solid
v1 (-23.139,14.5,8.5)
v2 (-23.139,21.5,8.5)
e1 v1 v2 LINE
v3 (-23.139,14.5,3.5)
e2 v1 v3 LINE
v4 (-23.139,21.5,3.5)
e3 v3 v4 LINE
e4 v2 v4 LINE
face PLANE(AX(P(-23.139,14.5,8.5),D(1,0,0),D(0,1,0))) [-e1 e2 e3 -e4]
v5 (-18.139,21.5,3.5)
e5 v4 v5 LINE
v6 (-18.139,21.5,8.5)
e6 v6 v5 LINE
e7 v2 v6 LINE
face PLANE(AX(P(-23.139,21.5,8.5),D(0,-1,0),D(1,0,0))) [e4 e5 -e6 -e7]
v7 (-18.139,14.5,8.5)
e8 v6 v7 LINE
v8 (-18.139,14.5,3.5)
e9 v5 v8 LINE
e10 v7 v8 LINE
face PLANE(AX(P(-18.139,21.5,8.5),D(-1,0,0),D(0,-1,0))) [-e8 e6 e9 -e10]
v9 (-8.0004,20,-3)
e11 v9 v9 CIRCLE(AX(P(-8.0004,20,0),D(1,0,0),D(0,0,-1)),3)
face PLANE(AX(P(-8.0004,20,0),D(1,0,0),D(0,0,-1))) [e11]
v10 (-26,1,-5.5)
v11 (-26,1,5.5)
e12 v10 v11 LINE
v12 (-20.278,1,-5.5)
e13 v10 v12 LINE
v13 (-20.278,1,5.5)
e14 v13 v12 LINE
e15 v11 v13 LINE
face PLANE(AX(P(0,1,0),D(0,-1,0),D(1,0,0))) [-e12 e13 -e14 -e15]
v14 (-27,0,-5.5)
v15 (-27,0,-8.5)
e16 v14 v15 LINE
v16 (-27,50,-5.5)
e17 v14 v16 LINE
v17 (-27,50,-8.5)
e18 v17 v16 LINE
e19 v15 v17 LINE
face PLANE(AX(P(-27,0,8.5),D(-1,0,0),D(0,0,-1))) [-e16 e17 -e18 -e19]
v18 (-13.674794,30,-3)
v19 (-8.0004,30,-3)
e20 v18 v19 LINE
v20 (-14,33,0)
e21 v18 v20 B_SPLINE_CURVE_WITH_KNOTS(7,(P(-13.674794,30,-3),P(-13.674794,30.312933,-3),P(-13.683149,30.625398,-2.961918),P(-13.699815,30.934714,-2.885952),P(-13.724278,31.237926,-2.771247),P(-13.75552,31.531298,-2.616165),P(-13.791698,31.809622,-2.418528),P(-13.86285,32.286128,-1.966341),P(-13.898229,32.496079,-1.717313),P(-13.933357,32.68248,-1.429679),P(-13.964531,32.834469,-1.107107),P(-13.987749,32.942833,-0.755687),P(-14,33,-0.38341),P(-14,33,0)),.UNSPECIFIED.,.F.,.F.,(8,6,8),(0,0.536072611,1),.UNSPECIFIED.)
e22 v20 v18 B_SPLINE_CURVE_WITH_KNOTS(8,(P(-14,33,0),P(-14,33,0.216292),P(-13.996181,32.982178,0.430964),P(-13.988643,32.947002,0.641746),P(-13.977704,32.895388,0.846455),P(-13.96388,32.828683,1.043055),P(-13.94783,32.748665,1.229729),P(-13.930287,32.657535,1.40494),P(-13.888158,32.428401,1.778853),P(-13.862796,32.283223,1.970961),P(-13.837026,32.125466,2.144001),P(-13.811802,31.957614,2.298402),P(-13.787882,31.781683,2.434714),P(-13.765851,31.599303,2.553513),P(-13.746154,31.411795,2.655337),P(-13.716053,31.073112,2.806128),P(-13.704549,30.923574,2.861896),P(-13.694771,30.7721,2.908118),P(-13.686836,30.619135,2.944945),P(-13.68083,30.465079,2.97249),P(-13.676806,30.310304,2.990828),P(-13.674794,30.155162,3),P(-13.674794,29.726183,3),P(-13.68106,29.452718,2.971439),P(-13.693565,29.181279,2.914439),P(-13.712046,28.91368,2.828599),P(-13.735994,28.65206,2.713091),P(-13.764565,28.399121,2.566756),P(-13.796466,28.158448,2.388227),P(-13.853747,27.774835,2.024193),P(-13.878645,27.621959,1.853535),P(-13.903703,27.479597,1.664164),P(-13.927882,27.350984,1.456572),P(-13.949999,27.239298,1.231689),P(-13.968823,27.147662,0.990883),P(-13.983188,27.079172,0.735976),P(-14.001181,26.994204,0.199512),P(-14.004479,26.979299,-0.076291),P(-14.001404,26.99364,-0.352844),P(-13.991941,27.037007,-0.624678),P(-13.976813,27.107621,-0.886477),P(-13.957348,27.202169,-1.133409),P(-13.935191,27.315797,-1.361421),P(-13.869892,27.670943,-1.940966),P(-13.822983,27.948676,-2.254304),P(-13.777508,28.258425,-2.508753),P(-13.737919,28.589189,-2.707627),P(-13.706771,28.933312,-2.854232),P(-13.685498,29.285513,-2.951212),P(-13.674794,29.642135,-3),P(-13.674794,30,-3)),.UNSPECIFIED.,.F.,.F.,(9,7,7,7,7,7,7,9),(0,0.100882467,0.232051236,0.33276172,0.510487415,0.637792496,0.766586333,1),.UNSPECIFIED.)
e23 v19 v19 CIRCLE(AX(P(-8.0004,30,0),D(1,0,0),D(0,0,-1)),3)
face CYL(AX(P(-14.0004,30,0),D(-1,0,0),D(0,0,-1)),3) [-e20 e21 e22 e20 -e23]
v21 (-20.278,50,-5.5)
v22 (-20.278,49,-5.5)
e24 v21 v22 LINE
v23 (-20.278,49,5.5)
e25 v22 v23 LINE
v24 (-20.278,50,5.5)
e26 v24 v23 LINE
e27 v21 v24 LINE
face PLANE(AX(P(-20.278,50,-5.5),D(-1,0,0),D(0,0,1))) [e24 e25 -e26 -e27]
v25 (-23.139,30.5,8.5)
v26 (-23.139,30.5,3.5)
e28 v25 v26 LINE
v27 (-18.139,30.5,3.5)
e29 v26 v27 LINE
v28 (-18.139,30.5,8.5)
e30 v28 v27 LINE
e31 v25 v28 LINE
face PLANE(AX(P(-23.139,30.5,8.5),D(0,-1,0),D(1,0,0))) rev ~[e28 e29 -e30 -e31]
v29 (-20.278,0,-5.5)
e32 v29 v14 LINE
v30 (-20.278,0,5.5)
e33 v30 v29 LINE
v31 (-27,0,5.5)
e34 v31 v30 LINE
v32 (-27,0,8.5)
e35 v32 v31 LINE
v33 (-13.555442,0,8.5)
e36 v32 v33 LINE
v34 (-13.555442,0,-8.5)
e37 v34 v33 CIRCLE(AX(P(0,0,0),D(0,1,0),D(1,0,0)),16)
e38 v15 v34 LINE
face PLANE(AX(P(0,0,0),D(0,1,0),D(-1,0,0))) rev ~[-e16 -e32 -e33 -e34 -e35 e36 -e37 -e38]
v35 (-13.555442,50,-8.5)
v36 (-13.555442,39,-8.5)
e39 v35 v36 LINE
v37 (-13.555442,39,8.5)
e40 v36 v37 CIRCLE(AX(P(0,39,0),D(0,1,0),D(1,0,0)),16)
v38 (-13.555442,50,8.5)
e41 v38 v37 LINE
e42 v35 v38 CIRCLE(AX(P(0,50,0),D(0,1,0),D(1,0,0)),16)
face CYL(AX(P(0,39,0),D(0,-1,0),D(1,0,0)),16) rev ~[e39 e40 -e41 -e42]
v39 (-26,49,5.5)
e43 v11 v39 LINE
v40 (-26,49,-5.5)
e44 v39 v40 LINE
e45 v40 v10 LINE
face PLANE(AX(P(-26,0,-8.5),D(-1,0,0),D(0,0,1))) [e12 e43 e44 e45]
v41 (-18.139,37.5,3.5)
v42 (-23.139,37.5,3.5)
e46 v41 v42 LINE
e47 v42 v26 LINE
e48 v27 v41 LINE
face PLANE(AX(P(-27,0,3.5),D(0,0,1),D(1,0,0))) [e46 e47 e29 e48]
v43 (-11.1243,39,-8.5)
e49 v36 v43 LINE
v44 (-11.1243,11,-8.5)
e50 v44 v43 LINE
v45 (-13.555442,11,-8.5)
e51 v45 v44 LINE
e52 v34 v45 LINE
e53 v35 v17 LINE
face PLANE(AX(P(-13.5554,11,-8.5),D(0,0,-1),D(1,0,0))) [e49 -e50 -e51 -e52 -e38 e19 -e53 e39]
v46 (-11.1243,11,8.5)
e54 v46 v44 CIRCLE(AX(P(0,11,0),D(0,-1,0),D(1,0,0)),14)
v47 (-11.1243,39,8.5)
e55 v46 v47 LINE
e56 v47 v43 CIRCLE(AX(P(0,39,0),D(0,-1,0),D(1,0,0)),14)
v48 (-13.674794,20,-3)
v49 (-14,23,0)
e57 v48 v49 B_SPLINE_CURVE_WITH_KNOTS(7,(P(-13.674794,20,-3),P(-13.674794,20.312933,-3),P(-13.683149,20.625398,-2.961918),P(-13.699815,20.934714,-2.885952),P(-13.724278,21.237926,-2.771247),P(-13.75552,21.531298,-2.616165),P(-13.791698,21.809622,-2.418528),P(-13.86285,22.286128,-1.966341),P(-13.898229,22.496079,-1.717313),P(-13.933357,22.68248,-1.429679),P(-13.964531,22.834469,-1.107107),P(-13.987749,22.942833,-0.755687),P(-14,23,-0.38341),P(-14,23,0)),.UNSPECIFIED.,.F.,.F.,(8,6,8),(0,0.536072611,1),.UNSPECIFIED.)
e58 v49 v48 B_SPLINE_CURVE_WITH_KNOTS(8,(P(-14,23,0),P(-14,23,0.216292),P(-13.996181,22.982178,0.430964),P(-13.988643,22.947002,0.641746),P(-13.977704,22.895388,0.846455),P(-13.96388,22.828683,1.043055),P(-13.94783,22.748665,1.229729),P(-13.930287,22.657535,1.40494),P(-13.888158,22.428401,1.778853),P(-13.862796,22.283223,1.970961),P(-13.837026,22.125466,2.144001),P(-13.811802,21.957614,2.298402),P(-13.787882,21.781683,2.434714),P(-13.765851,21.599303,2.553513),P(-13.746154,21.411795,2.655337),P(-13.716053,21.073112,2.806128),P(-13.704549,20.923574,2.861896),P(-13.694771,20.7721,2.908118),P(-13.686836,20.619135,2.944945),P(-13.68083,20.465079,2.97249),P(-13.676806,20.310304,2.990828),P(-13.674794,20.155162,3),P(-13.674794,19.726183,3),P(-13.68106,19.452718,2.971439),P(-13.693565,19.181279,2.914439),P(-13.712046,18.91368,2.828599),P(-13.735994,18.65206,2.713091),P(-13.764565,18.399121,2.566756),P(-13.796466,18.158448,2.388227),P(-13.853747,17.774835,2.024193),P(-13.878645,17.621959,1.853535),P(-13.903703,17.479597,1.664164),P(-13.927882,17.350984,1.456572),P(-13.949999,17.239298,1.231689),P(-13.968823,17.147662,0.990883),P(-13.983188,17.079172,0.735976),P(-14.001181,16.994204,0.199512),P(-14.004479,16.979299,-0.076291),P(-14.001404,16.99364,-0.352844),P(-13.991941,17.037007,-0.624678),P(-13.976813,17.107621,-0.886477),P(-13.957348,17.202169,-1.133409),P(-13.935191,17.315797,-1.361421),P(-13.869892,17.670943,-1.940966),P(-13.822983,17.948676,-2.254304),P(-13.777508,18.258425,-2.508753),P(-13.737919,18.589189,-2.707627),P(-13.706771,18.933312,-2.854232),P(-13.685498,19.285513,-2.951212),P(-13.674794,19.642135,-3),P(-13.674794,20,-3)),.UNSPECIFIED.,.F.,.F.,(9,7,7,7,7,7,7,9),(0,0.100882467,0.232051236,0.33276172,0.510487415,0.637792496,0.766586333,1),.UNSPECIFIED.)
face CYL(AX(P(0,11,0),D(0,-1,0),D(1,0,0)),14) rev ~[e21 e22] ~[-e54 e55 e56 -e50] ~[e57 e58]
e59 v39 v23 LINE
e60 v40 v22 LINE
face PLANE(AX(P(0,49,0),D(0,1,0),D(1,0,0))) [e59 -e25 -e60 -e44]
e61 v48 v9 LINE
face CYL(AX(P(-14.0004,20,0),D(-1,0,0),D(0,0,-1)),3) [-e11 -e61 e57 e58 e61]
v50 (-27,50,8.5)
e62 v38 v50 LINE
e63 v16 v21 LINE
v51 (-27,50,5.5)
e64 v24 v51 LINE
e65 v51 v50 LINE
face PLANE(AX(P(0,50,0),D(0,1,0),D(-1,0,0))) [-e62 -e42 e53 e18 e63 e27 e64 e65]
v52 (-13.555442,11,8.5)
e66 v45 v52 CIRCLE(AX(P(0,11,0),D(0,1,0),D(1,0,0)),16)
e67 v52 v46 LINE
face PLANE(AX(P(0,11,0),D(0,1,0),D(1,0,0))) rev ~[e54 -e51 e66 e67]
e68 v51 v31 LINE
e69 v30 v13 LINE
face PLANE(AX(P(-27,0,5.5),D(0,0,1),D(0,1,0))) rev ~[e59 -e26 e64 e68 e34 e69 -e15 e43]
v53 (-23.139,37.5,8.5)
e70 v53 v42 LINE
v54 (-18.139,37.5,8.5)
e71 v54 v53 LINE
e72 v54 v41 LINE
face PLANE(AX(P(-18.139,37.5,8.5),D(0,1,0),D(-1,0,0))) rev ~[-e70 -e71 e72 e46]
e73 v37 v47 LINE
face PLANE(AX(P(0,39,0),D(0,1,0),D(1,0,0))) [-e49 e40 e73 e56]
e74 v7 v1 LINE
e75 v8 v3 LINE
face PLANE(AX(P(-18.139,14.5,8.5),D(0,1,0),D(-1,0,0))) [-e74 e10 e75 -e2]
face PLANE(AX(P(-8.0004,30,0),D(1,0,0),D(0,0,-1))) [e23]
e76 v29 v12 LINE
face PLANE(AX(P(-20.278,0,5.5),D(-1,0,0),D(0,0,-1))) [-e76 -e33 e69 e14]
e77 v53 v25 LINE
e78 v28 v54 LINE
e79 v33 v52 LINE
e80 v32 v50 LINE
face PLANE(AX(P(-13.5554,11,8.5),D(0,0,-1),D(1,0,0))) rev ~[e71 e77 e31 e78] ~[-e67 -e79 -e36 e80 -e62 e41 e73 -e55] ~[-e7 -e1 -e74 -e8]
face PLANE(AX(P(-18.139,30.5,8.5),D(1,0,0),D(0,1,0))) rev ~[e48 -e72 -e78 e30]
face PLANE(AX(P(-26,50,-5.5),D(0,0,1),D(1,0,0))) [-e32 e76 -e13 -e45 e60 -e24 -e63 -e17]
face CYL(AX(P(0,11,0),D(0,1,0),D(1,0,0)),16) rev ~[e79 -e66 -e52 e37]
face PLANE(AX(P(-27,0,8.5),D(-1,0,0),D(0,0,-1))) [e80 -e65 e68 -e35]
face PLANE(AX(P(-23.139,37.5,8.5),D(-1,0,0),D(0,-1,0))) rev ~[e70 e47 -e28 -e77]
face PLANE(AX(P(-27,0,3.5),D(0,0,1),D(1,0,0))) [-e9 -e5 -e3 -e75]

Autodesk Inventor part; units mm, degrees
sketch "Sketch1" plane through (0, 0, 0) normal (0, 1, 0) x (-1, 0, 0)
  circle A0 centre (0, 0) radius 14
  line L0 (14, 0) -> (27, 0)
  circle A1 centre (0, 0) radius 16
  line L1 (27, 0) -> (27, -8.5)
  line L2 (27, -8.5) -> (13.5552, -8.5)
  line L3 (13.5552, 8.5) -> (27, 8.5)
  line L4 (27, 8.5) -> (27, -8.5)
  line L5 (13.5552, 8.5) -> (11.1243, 8.5)
  line L6 (13.5552, -8.5) -> (11.1243, -8.5)
  line L7 (13.5552, 8.5) -> (13.5552, -8.5)
  dimension "d0" = 28
  dimension "d1" = 13
  dimension "d2" = 32
  dimension "d3" = 8.5
  dimension "d5" = 17
extrude "Extrusion1" add sketch "Sketch1" along normal blind 50 contours L5 L7 A0 | A0 L7 L6 | L7 A1 L0 A0 | L3 L4 L0 A1 | A0 L0 A1 L7 | A1 L0 L1 L2
ref_plane "Work Plane1" through (0, 11, 0) normal (0, -1, 0) x (1, 0, 0)
sketch "Sketch2" plane through (0, 11, 0) normal (0, -1, 0) x (1, 0, 0)
  circle A0 centre (0, 0) radius 16
  line L0 (-11.1243, -8.5) -> (-27, -8.5) projected
  circle A1 centre (0, 0) radius 14
  line L1 (-27, 8.5) -> (-11.1243, 8.5) projected
  line L2 (-13.5554, 8.5) -> (-11.1243, 8.5)
  line L3 (-13.5554, -8.5) -> (-11.1243, -8.5)
  dimension "d9" = 32
extrude "Extrusion2" cut sketch "Sketch2" against normal blind 28 contours L1 A1 L0 A0 picked at (-13.7856, -6.5585)
ref_plane "Work Plane2" through (-13.5554, 11, 8.5) normal (-1, 0, 0) x (0, 1, 0)
sketch "Sketch3" plane through (-13.5554, 11, 8.5) normal (-1, 0, 0) x (0, 1, 0)
  line L0 (28, 17) -> (28, 0) construction
  line L1 (28, 8.5) -> (0, 8.5) construction
  line L2 (0, 17) -> (0, 0) construction
  line L3 (28, 8.5) -> (19, 8.5)
  circle A0 centre (19, 8.5) radius 3
  line L4 (0, 8.5) -> (9, 8.5)
  circle A1 centre (9, 8.5) radius 3
  point P0 (-11, 8.5)
  dimension "d14" = 9
  dimension "d15" = 6
  dimension "d17" = 9
  dimension "d18" = 6
extrude "Extrusion3" add sketch "Sketch3" along normal up to surface
sketch "Sketch4" plane through (-13.5554, 30, 0) normal (1, 0, 0) x (0, 0, -1)
  circle A0 centre (0, 0) radius 3 projected
  circle A1 centre (0, 0) radius 3
  point P0 (0, -30)
sketch "Sketch5" plane through (-13.5554, 20, 0) normal (1, 0, 0) x (0, 0, -1)
  circle A0 centre (0, 0) radius 3
  point P0 (0, -20)
extrude "Extrusion4" cut sketch "Sketch4" against normal blind 0.445
extrude "Extrusion5" cut sketch "Sketch5" against normal blind 0.445
sketch "Sketch6" plane through (-14.0004, 30, 0) normal (1, 0, 0) x (0, 0, -1)
  circle A0 centre (0, 0) radius 3
  point P0 (0, -30)
sketch "Sketch7" plane through (-14.0004, 20, 0) normal (1, 0, 0) x (0, 0, -1)
  circle A0 centre (0, 0) radius 3
  point P0 (0, -20)
extrude "Extrusion6" add sketch "Sketch6" along normal blind 6
extrude "Extrusion7" add sketch "Sketch7" along normal up to surface (6 mm away)
sketch "Sketch8" plane through (0, 11, 0) normal (0, 1, 0) x (1, 0, 0)
  circle A0 centre (0, 0) radius 14
  circle A1 centre (0, 0) radius 16
  line L0 (-13.5554, 8.5) -> (-11.1243, 8.5) projected
  line L1 (-13.5554, 8.5) -> (-11.1243, 8.5)
  arc A2 (-11.1243, 8.5) -> (-11.1243, -8.5) centre (0, 0) ccw projected
  line L2 (-13.5554, -8.5) -> (-11.1243, -8.5)
  dimension "d29" = 32
sketch "Sketch9" plane through (0, 11, 0) normal (0, 1, 0) x (1, 0, 0)
  circle A0 centre (0, 0) radius 16
  circle A1 centre (0, 0) radius 14
  dimension "d30" = 32
extrude "Extrusion8" add sketch "Sketch8" along normal up to surface (28 mm away) contours A0 L2 A1 L0 picked at (-13.7856, -6.5585)
extrude "Extrusion9" cut sketch "Sketch9" against normal up to surface (11 mm away)
ref_plane "Work Plane3" through (0, 39, 0) normal (0, 1, 0) x (1, 0, 0)
sketch "Sketch10" plane through (0, 39, 0) normal (0, 1, 0) x (1, 0, 0)
  circle A0 centre (0, 0) radius 16
  circle A1 centre (0, 0) radius 14
  dimension "d36" = 32
  dimension "d37" = 28
extrude "Extrusion10" cut sketch "Sketch10" along normal up to surface (11 mm away)
sketch "Sketch11" plane through (-27, 0, -8.5) normal (-1, 0, 0) x (0, 0, 1)
  line L0 (17, 0) -> (17, 50) projected
  line L1 (17, 50) -> (14, 50)
  line L2 (0, 50) -> (17, 50) projected
  line L3 (14, 50) -> (3, 50)
  line L4 (0, 0) -> (0, 50) projected
  line L5 (0, 0) -> (3, 0)
  line L6 (17, 0) -> (0, 0) projected
  line L7 (14, 50) -> (3, 50)
  line L8 (3, 50) -> (3, 0)
  line L9 (3, 0) -> (14, 0)
  line L10 (14, 0) -> (14, 50)
  point P0 (8.5, 0)
  dimension "d40" = 3
  dimension "d41" = 11
  dimension "d42" = 3
extrude "Extrusion11" cut sketch "Sketch11" against normal blind 1 contours L6 L8 L2 L10
sketch "Sketch12" plane through (0, 50, 0) normal (0, 1, 0) x (1, 0, 0)
  line L0 (-27, -5.5) -> (-27, -8.5) projected
  line L1 (-27, -5.5) -> (-20.278, -5.5)
  line L2 (-27, 5.5) -> (-26, 5.5) projected
  line L3 (-20.278, -5.5) -> (-27, -5.5)
  line L4 (-27, -5.5) -> (-27, 5.5)
  line L5 (-27, 5.5) -> (-20.278, 5.5)
  line L6 (-20.278, 5.5) -> (-20.278, -5.5)
  point P0 (0, 0)
  dimension "d45" = 6.722
sketch "Sketch13" plane through (0, 0, 0) normal (0, -1, 0) x (1, 0, 0)
  line L0 (-27, -5.5) -> (-26, -5.5) projected
  line L1 (-27, -5.5) -> (-20.278, -5.5)
  line L2 (-20.278, -5.5) -> (-27, -5.5)
  line L3 (-27, -5.5) -> (-27, 5.5)
  line L4 (-27, 5.5) -> (-20.278, 5.5)
  line L5 (-20.278, 5.5) -> (-20.278, -5.5)
  point P0 (0, 0)
  dimension "d46" = 6.722
extrude "Extrusion12" cut sketch "Sketch13" against normal blind 1
extrude "Extrusion13" cut sketch "Sketch12" against normal blind 1
sketch "Sketch14" plane through (-27, 0, 8.5) normal (0, 0, 1) x (1, 0, 0)
  line L0 (0, 50) -> (6.722, 50) construction
  line L1 (6.722, 50) -> (6.722, 41) construction
  line L2 (6.722, 41) -> (6.722, 34) construction
  line L3 (0, 34) -> (0, 31) construction
  line L4 (0, 31) -> (3.361, 31) construction
  line L5 (6.722, 34) -> (3.361, 34) construction
  line L6 (3.361, 34) -> (3.361, 31) construction
  line L7 (3.361, 31) -> (4.861, 31) construction
  line L8 (0, 0) -> (0, 50) construction
  line L9 (4.861, 31) -> (4.861, 38.2796) construction
  line L10 (4.861, 31) -> (7.861, 31) construction
  line L11 (13, 39) -> (13, 11) construction
  line L12 (6.361, 31) -> (6.361, 37.5) construction
  line L13 (4.861, 36.5) -> (7.861, 36.5) construction
  line L14 (7.861, 36.5) -> (7.861, 31.5) construction
  line L15 (7.861, 31.5) -> (4.861, 31.5) construction
  line L16 (4.861, 31.5) -> (4.861, 36.5) construction
  line L17 (4.861, 36.5) -> (7.861, 31.5) construction
  line L18 (7.861, 36.5) -> (4.861, 31.5) construction
  line L19 (6.361, 31.5) -> (6.361, 20.5) construction
  line L20 (6.361, 20.5) -> (6.361, 18) construction
  line L21 (4.861, 15.5) -> (7.861, 15.5) construction
  line L22 (7.861, 15.5) -> (7.861, 20.5) construction
  line L23 (7.861, 20.5) -> (4.861, 20.5) construction
  line L24 (4.861, 20.5) -> (4.861, 15.5) construction
  line L25 (4.861, 15.5) -> (7.861, 20.5) construction
  line L26 (7.861, 15.5) -> (4.861, 20.5) construction
  line L27 (8.861, 21.5) -> (8.861, 14.5)
  line L28 (8.861, 14.5) -> (3.861, 14.5)
  line L29 (3.861, 14.5) -> (3.861, 21.5)
  line L30 (3.861, 21.5) -> (8.861, 21.5)
  line L31 (8.861, 37.5) -> (3.861, 37.5)
  line L32 (3.861, 37.5) -> (3.861, 30.5)
  line L33 (3.861, 30.5) -> (8.861, 30.5)
  line L34 (8.861, 30.5) -> (8.861, 37.5)
  point P0 (27, 0)
  point P1 (6.361, 34)
  dimension "d51" = 9
  dimension "d52" = 7
  dimension "d53" = 3
  dimension "d54" = 1.5
  dimension "d55" = 3
  dimension "d56" = 3
  dimension "d57" = 5
  dimension "d58" = 11
  dimension "d59" = 2.5
  dimension "d60" = 1
  dimension "d61" = 1
extrude "Extrusion14" cut sketch "Sketch14" against normal blind 5
properties part number "Button"
